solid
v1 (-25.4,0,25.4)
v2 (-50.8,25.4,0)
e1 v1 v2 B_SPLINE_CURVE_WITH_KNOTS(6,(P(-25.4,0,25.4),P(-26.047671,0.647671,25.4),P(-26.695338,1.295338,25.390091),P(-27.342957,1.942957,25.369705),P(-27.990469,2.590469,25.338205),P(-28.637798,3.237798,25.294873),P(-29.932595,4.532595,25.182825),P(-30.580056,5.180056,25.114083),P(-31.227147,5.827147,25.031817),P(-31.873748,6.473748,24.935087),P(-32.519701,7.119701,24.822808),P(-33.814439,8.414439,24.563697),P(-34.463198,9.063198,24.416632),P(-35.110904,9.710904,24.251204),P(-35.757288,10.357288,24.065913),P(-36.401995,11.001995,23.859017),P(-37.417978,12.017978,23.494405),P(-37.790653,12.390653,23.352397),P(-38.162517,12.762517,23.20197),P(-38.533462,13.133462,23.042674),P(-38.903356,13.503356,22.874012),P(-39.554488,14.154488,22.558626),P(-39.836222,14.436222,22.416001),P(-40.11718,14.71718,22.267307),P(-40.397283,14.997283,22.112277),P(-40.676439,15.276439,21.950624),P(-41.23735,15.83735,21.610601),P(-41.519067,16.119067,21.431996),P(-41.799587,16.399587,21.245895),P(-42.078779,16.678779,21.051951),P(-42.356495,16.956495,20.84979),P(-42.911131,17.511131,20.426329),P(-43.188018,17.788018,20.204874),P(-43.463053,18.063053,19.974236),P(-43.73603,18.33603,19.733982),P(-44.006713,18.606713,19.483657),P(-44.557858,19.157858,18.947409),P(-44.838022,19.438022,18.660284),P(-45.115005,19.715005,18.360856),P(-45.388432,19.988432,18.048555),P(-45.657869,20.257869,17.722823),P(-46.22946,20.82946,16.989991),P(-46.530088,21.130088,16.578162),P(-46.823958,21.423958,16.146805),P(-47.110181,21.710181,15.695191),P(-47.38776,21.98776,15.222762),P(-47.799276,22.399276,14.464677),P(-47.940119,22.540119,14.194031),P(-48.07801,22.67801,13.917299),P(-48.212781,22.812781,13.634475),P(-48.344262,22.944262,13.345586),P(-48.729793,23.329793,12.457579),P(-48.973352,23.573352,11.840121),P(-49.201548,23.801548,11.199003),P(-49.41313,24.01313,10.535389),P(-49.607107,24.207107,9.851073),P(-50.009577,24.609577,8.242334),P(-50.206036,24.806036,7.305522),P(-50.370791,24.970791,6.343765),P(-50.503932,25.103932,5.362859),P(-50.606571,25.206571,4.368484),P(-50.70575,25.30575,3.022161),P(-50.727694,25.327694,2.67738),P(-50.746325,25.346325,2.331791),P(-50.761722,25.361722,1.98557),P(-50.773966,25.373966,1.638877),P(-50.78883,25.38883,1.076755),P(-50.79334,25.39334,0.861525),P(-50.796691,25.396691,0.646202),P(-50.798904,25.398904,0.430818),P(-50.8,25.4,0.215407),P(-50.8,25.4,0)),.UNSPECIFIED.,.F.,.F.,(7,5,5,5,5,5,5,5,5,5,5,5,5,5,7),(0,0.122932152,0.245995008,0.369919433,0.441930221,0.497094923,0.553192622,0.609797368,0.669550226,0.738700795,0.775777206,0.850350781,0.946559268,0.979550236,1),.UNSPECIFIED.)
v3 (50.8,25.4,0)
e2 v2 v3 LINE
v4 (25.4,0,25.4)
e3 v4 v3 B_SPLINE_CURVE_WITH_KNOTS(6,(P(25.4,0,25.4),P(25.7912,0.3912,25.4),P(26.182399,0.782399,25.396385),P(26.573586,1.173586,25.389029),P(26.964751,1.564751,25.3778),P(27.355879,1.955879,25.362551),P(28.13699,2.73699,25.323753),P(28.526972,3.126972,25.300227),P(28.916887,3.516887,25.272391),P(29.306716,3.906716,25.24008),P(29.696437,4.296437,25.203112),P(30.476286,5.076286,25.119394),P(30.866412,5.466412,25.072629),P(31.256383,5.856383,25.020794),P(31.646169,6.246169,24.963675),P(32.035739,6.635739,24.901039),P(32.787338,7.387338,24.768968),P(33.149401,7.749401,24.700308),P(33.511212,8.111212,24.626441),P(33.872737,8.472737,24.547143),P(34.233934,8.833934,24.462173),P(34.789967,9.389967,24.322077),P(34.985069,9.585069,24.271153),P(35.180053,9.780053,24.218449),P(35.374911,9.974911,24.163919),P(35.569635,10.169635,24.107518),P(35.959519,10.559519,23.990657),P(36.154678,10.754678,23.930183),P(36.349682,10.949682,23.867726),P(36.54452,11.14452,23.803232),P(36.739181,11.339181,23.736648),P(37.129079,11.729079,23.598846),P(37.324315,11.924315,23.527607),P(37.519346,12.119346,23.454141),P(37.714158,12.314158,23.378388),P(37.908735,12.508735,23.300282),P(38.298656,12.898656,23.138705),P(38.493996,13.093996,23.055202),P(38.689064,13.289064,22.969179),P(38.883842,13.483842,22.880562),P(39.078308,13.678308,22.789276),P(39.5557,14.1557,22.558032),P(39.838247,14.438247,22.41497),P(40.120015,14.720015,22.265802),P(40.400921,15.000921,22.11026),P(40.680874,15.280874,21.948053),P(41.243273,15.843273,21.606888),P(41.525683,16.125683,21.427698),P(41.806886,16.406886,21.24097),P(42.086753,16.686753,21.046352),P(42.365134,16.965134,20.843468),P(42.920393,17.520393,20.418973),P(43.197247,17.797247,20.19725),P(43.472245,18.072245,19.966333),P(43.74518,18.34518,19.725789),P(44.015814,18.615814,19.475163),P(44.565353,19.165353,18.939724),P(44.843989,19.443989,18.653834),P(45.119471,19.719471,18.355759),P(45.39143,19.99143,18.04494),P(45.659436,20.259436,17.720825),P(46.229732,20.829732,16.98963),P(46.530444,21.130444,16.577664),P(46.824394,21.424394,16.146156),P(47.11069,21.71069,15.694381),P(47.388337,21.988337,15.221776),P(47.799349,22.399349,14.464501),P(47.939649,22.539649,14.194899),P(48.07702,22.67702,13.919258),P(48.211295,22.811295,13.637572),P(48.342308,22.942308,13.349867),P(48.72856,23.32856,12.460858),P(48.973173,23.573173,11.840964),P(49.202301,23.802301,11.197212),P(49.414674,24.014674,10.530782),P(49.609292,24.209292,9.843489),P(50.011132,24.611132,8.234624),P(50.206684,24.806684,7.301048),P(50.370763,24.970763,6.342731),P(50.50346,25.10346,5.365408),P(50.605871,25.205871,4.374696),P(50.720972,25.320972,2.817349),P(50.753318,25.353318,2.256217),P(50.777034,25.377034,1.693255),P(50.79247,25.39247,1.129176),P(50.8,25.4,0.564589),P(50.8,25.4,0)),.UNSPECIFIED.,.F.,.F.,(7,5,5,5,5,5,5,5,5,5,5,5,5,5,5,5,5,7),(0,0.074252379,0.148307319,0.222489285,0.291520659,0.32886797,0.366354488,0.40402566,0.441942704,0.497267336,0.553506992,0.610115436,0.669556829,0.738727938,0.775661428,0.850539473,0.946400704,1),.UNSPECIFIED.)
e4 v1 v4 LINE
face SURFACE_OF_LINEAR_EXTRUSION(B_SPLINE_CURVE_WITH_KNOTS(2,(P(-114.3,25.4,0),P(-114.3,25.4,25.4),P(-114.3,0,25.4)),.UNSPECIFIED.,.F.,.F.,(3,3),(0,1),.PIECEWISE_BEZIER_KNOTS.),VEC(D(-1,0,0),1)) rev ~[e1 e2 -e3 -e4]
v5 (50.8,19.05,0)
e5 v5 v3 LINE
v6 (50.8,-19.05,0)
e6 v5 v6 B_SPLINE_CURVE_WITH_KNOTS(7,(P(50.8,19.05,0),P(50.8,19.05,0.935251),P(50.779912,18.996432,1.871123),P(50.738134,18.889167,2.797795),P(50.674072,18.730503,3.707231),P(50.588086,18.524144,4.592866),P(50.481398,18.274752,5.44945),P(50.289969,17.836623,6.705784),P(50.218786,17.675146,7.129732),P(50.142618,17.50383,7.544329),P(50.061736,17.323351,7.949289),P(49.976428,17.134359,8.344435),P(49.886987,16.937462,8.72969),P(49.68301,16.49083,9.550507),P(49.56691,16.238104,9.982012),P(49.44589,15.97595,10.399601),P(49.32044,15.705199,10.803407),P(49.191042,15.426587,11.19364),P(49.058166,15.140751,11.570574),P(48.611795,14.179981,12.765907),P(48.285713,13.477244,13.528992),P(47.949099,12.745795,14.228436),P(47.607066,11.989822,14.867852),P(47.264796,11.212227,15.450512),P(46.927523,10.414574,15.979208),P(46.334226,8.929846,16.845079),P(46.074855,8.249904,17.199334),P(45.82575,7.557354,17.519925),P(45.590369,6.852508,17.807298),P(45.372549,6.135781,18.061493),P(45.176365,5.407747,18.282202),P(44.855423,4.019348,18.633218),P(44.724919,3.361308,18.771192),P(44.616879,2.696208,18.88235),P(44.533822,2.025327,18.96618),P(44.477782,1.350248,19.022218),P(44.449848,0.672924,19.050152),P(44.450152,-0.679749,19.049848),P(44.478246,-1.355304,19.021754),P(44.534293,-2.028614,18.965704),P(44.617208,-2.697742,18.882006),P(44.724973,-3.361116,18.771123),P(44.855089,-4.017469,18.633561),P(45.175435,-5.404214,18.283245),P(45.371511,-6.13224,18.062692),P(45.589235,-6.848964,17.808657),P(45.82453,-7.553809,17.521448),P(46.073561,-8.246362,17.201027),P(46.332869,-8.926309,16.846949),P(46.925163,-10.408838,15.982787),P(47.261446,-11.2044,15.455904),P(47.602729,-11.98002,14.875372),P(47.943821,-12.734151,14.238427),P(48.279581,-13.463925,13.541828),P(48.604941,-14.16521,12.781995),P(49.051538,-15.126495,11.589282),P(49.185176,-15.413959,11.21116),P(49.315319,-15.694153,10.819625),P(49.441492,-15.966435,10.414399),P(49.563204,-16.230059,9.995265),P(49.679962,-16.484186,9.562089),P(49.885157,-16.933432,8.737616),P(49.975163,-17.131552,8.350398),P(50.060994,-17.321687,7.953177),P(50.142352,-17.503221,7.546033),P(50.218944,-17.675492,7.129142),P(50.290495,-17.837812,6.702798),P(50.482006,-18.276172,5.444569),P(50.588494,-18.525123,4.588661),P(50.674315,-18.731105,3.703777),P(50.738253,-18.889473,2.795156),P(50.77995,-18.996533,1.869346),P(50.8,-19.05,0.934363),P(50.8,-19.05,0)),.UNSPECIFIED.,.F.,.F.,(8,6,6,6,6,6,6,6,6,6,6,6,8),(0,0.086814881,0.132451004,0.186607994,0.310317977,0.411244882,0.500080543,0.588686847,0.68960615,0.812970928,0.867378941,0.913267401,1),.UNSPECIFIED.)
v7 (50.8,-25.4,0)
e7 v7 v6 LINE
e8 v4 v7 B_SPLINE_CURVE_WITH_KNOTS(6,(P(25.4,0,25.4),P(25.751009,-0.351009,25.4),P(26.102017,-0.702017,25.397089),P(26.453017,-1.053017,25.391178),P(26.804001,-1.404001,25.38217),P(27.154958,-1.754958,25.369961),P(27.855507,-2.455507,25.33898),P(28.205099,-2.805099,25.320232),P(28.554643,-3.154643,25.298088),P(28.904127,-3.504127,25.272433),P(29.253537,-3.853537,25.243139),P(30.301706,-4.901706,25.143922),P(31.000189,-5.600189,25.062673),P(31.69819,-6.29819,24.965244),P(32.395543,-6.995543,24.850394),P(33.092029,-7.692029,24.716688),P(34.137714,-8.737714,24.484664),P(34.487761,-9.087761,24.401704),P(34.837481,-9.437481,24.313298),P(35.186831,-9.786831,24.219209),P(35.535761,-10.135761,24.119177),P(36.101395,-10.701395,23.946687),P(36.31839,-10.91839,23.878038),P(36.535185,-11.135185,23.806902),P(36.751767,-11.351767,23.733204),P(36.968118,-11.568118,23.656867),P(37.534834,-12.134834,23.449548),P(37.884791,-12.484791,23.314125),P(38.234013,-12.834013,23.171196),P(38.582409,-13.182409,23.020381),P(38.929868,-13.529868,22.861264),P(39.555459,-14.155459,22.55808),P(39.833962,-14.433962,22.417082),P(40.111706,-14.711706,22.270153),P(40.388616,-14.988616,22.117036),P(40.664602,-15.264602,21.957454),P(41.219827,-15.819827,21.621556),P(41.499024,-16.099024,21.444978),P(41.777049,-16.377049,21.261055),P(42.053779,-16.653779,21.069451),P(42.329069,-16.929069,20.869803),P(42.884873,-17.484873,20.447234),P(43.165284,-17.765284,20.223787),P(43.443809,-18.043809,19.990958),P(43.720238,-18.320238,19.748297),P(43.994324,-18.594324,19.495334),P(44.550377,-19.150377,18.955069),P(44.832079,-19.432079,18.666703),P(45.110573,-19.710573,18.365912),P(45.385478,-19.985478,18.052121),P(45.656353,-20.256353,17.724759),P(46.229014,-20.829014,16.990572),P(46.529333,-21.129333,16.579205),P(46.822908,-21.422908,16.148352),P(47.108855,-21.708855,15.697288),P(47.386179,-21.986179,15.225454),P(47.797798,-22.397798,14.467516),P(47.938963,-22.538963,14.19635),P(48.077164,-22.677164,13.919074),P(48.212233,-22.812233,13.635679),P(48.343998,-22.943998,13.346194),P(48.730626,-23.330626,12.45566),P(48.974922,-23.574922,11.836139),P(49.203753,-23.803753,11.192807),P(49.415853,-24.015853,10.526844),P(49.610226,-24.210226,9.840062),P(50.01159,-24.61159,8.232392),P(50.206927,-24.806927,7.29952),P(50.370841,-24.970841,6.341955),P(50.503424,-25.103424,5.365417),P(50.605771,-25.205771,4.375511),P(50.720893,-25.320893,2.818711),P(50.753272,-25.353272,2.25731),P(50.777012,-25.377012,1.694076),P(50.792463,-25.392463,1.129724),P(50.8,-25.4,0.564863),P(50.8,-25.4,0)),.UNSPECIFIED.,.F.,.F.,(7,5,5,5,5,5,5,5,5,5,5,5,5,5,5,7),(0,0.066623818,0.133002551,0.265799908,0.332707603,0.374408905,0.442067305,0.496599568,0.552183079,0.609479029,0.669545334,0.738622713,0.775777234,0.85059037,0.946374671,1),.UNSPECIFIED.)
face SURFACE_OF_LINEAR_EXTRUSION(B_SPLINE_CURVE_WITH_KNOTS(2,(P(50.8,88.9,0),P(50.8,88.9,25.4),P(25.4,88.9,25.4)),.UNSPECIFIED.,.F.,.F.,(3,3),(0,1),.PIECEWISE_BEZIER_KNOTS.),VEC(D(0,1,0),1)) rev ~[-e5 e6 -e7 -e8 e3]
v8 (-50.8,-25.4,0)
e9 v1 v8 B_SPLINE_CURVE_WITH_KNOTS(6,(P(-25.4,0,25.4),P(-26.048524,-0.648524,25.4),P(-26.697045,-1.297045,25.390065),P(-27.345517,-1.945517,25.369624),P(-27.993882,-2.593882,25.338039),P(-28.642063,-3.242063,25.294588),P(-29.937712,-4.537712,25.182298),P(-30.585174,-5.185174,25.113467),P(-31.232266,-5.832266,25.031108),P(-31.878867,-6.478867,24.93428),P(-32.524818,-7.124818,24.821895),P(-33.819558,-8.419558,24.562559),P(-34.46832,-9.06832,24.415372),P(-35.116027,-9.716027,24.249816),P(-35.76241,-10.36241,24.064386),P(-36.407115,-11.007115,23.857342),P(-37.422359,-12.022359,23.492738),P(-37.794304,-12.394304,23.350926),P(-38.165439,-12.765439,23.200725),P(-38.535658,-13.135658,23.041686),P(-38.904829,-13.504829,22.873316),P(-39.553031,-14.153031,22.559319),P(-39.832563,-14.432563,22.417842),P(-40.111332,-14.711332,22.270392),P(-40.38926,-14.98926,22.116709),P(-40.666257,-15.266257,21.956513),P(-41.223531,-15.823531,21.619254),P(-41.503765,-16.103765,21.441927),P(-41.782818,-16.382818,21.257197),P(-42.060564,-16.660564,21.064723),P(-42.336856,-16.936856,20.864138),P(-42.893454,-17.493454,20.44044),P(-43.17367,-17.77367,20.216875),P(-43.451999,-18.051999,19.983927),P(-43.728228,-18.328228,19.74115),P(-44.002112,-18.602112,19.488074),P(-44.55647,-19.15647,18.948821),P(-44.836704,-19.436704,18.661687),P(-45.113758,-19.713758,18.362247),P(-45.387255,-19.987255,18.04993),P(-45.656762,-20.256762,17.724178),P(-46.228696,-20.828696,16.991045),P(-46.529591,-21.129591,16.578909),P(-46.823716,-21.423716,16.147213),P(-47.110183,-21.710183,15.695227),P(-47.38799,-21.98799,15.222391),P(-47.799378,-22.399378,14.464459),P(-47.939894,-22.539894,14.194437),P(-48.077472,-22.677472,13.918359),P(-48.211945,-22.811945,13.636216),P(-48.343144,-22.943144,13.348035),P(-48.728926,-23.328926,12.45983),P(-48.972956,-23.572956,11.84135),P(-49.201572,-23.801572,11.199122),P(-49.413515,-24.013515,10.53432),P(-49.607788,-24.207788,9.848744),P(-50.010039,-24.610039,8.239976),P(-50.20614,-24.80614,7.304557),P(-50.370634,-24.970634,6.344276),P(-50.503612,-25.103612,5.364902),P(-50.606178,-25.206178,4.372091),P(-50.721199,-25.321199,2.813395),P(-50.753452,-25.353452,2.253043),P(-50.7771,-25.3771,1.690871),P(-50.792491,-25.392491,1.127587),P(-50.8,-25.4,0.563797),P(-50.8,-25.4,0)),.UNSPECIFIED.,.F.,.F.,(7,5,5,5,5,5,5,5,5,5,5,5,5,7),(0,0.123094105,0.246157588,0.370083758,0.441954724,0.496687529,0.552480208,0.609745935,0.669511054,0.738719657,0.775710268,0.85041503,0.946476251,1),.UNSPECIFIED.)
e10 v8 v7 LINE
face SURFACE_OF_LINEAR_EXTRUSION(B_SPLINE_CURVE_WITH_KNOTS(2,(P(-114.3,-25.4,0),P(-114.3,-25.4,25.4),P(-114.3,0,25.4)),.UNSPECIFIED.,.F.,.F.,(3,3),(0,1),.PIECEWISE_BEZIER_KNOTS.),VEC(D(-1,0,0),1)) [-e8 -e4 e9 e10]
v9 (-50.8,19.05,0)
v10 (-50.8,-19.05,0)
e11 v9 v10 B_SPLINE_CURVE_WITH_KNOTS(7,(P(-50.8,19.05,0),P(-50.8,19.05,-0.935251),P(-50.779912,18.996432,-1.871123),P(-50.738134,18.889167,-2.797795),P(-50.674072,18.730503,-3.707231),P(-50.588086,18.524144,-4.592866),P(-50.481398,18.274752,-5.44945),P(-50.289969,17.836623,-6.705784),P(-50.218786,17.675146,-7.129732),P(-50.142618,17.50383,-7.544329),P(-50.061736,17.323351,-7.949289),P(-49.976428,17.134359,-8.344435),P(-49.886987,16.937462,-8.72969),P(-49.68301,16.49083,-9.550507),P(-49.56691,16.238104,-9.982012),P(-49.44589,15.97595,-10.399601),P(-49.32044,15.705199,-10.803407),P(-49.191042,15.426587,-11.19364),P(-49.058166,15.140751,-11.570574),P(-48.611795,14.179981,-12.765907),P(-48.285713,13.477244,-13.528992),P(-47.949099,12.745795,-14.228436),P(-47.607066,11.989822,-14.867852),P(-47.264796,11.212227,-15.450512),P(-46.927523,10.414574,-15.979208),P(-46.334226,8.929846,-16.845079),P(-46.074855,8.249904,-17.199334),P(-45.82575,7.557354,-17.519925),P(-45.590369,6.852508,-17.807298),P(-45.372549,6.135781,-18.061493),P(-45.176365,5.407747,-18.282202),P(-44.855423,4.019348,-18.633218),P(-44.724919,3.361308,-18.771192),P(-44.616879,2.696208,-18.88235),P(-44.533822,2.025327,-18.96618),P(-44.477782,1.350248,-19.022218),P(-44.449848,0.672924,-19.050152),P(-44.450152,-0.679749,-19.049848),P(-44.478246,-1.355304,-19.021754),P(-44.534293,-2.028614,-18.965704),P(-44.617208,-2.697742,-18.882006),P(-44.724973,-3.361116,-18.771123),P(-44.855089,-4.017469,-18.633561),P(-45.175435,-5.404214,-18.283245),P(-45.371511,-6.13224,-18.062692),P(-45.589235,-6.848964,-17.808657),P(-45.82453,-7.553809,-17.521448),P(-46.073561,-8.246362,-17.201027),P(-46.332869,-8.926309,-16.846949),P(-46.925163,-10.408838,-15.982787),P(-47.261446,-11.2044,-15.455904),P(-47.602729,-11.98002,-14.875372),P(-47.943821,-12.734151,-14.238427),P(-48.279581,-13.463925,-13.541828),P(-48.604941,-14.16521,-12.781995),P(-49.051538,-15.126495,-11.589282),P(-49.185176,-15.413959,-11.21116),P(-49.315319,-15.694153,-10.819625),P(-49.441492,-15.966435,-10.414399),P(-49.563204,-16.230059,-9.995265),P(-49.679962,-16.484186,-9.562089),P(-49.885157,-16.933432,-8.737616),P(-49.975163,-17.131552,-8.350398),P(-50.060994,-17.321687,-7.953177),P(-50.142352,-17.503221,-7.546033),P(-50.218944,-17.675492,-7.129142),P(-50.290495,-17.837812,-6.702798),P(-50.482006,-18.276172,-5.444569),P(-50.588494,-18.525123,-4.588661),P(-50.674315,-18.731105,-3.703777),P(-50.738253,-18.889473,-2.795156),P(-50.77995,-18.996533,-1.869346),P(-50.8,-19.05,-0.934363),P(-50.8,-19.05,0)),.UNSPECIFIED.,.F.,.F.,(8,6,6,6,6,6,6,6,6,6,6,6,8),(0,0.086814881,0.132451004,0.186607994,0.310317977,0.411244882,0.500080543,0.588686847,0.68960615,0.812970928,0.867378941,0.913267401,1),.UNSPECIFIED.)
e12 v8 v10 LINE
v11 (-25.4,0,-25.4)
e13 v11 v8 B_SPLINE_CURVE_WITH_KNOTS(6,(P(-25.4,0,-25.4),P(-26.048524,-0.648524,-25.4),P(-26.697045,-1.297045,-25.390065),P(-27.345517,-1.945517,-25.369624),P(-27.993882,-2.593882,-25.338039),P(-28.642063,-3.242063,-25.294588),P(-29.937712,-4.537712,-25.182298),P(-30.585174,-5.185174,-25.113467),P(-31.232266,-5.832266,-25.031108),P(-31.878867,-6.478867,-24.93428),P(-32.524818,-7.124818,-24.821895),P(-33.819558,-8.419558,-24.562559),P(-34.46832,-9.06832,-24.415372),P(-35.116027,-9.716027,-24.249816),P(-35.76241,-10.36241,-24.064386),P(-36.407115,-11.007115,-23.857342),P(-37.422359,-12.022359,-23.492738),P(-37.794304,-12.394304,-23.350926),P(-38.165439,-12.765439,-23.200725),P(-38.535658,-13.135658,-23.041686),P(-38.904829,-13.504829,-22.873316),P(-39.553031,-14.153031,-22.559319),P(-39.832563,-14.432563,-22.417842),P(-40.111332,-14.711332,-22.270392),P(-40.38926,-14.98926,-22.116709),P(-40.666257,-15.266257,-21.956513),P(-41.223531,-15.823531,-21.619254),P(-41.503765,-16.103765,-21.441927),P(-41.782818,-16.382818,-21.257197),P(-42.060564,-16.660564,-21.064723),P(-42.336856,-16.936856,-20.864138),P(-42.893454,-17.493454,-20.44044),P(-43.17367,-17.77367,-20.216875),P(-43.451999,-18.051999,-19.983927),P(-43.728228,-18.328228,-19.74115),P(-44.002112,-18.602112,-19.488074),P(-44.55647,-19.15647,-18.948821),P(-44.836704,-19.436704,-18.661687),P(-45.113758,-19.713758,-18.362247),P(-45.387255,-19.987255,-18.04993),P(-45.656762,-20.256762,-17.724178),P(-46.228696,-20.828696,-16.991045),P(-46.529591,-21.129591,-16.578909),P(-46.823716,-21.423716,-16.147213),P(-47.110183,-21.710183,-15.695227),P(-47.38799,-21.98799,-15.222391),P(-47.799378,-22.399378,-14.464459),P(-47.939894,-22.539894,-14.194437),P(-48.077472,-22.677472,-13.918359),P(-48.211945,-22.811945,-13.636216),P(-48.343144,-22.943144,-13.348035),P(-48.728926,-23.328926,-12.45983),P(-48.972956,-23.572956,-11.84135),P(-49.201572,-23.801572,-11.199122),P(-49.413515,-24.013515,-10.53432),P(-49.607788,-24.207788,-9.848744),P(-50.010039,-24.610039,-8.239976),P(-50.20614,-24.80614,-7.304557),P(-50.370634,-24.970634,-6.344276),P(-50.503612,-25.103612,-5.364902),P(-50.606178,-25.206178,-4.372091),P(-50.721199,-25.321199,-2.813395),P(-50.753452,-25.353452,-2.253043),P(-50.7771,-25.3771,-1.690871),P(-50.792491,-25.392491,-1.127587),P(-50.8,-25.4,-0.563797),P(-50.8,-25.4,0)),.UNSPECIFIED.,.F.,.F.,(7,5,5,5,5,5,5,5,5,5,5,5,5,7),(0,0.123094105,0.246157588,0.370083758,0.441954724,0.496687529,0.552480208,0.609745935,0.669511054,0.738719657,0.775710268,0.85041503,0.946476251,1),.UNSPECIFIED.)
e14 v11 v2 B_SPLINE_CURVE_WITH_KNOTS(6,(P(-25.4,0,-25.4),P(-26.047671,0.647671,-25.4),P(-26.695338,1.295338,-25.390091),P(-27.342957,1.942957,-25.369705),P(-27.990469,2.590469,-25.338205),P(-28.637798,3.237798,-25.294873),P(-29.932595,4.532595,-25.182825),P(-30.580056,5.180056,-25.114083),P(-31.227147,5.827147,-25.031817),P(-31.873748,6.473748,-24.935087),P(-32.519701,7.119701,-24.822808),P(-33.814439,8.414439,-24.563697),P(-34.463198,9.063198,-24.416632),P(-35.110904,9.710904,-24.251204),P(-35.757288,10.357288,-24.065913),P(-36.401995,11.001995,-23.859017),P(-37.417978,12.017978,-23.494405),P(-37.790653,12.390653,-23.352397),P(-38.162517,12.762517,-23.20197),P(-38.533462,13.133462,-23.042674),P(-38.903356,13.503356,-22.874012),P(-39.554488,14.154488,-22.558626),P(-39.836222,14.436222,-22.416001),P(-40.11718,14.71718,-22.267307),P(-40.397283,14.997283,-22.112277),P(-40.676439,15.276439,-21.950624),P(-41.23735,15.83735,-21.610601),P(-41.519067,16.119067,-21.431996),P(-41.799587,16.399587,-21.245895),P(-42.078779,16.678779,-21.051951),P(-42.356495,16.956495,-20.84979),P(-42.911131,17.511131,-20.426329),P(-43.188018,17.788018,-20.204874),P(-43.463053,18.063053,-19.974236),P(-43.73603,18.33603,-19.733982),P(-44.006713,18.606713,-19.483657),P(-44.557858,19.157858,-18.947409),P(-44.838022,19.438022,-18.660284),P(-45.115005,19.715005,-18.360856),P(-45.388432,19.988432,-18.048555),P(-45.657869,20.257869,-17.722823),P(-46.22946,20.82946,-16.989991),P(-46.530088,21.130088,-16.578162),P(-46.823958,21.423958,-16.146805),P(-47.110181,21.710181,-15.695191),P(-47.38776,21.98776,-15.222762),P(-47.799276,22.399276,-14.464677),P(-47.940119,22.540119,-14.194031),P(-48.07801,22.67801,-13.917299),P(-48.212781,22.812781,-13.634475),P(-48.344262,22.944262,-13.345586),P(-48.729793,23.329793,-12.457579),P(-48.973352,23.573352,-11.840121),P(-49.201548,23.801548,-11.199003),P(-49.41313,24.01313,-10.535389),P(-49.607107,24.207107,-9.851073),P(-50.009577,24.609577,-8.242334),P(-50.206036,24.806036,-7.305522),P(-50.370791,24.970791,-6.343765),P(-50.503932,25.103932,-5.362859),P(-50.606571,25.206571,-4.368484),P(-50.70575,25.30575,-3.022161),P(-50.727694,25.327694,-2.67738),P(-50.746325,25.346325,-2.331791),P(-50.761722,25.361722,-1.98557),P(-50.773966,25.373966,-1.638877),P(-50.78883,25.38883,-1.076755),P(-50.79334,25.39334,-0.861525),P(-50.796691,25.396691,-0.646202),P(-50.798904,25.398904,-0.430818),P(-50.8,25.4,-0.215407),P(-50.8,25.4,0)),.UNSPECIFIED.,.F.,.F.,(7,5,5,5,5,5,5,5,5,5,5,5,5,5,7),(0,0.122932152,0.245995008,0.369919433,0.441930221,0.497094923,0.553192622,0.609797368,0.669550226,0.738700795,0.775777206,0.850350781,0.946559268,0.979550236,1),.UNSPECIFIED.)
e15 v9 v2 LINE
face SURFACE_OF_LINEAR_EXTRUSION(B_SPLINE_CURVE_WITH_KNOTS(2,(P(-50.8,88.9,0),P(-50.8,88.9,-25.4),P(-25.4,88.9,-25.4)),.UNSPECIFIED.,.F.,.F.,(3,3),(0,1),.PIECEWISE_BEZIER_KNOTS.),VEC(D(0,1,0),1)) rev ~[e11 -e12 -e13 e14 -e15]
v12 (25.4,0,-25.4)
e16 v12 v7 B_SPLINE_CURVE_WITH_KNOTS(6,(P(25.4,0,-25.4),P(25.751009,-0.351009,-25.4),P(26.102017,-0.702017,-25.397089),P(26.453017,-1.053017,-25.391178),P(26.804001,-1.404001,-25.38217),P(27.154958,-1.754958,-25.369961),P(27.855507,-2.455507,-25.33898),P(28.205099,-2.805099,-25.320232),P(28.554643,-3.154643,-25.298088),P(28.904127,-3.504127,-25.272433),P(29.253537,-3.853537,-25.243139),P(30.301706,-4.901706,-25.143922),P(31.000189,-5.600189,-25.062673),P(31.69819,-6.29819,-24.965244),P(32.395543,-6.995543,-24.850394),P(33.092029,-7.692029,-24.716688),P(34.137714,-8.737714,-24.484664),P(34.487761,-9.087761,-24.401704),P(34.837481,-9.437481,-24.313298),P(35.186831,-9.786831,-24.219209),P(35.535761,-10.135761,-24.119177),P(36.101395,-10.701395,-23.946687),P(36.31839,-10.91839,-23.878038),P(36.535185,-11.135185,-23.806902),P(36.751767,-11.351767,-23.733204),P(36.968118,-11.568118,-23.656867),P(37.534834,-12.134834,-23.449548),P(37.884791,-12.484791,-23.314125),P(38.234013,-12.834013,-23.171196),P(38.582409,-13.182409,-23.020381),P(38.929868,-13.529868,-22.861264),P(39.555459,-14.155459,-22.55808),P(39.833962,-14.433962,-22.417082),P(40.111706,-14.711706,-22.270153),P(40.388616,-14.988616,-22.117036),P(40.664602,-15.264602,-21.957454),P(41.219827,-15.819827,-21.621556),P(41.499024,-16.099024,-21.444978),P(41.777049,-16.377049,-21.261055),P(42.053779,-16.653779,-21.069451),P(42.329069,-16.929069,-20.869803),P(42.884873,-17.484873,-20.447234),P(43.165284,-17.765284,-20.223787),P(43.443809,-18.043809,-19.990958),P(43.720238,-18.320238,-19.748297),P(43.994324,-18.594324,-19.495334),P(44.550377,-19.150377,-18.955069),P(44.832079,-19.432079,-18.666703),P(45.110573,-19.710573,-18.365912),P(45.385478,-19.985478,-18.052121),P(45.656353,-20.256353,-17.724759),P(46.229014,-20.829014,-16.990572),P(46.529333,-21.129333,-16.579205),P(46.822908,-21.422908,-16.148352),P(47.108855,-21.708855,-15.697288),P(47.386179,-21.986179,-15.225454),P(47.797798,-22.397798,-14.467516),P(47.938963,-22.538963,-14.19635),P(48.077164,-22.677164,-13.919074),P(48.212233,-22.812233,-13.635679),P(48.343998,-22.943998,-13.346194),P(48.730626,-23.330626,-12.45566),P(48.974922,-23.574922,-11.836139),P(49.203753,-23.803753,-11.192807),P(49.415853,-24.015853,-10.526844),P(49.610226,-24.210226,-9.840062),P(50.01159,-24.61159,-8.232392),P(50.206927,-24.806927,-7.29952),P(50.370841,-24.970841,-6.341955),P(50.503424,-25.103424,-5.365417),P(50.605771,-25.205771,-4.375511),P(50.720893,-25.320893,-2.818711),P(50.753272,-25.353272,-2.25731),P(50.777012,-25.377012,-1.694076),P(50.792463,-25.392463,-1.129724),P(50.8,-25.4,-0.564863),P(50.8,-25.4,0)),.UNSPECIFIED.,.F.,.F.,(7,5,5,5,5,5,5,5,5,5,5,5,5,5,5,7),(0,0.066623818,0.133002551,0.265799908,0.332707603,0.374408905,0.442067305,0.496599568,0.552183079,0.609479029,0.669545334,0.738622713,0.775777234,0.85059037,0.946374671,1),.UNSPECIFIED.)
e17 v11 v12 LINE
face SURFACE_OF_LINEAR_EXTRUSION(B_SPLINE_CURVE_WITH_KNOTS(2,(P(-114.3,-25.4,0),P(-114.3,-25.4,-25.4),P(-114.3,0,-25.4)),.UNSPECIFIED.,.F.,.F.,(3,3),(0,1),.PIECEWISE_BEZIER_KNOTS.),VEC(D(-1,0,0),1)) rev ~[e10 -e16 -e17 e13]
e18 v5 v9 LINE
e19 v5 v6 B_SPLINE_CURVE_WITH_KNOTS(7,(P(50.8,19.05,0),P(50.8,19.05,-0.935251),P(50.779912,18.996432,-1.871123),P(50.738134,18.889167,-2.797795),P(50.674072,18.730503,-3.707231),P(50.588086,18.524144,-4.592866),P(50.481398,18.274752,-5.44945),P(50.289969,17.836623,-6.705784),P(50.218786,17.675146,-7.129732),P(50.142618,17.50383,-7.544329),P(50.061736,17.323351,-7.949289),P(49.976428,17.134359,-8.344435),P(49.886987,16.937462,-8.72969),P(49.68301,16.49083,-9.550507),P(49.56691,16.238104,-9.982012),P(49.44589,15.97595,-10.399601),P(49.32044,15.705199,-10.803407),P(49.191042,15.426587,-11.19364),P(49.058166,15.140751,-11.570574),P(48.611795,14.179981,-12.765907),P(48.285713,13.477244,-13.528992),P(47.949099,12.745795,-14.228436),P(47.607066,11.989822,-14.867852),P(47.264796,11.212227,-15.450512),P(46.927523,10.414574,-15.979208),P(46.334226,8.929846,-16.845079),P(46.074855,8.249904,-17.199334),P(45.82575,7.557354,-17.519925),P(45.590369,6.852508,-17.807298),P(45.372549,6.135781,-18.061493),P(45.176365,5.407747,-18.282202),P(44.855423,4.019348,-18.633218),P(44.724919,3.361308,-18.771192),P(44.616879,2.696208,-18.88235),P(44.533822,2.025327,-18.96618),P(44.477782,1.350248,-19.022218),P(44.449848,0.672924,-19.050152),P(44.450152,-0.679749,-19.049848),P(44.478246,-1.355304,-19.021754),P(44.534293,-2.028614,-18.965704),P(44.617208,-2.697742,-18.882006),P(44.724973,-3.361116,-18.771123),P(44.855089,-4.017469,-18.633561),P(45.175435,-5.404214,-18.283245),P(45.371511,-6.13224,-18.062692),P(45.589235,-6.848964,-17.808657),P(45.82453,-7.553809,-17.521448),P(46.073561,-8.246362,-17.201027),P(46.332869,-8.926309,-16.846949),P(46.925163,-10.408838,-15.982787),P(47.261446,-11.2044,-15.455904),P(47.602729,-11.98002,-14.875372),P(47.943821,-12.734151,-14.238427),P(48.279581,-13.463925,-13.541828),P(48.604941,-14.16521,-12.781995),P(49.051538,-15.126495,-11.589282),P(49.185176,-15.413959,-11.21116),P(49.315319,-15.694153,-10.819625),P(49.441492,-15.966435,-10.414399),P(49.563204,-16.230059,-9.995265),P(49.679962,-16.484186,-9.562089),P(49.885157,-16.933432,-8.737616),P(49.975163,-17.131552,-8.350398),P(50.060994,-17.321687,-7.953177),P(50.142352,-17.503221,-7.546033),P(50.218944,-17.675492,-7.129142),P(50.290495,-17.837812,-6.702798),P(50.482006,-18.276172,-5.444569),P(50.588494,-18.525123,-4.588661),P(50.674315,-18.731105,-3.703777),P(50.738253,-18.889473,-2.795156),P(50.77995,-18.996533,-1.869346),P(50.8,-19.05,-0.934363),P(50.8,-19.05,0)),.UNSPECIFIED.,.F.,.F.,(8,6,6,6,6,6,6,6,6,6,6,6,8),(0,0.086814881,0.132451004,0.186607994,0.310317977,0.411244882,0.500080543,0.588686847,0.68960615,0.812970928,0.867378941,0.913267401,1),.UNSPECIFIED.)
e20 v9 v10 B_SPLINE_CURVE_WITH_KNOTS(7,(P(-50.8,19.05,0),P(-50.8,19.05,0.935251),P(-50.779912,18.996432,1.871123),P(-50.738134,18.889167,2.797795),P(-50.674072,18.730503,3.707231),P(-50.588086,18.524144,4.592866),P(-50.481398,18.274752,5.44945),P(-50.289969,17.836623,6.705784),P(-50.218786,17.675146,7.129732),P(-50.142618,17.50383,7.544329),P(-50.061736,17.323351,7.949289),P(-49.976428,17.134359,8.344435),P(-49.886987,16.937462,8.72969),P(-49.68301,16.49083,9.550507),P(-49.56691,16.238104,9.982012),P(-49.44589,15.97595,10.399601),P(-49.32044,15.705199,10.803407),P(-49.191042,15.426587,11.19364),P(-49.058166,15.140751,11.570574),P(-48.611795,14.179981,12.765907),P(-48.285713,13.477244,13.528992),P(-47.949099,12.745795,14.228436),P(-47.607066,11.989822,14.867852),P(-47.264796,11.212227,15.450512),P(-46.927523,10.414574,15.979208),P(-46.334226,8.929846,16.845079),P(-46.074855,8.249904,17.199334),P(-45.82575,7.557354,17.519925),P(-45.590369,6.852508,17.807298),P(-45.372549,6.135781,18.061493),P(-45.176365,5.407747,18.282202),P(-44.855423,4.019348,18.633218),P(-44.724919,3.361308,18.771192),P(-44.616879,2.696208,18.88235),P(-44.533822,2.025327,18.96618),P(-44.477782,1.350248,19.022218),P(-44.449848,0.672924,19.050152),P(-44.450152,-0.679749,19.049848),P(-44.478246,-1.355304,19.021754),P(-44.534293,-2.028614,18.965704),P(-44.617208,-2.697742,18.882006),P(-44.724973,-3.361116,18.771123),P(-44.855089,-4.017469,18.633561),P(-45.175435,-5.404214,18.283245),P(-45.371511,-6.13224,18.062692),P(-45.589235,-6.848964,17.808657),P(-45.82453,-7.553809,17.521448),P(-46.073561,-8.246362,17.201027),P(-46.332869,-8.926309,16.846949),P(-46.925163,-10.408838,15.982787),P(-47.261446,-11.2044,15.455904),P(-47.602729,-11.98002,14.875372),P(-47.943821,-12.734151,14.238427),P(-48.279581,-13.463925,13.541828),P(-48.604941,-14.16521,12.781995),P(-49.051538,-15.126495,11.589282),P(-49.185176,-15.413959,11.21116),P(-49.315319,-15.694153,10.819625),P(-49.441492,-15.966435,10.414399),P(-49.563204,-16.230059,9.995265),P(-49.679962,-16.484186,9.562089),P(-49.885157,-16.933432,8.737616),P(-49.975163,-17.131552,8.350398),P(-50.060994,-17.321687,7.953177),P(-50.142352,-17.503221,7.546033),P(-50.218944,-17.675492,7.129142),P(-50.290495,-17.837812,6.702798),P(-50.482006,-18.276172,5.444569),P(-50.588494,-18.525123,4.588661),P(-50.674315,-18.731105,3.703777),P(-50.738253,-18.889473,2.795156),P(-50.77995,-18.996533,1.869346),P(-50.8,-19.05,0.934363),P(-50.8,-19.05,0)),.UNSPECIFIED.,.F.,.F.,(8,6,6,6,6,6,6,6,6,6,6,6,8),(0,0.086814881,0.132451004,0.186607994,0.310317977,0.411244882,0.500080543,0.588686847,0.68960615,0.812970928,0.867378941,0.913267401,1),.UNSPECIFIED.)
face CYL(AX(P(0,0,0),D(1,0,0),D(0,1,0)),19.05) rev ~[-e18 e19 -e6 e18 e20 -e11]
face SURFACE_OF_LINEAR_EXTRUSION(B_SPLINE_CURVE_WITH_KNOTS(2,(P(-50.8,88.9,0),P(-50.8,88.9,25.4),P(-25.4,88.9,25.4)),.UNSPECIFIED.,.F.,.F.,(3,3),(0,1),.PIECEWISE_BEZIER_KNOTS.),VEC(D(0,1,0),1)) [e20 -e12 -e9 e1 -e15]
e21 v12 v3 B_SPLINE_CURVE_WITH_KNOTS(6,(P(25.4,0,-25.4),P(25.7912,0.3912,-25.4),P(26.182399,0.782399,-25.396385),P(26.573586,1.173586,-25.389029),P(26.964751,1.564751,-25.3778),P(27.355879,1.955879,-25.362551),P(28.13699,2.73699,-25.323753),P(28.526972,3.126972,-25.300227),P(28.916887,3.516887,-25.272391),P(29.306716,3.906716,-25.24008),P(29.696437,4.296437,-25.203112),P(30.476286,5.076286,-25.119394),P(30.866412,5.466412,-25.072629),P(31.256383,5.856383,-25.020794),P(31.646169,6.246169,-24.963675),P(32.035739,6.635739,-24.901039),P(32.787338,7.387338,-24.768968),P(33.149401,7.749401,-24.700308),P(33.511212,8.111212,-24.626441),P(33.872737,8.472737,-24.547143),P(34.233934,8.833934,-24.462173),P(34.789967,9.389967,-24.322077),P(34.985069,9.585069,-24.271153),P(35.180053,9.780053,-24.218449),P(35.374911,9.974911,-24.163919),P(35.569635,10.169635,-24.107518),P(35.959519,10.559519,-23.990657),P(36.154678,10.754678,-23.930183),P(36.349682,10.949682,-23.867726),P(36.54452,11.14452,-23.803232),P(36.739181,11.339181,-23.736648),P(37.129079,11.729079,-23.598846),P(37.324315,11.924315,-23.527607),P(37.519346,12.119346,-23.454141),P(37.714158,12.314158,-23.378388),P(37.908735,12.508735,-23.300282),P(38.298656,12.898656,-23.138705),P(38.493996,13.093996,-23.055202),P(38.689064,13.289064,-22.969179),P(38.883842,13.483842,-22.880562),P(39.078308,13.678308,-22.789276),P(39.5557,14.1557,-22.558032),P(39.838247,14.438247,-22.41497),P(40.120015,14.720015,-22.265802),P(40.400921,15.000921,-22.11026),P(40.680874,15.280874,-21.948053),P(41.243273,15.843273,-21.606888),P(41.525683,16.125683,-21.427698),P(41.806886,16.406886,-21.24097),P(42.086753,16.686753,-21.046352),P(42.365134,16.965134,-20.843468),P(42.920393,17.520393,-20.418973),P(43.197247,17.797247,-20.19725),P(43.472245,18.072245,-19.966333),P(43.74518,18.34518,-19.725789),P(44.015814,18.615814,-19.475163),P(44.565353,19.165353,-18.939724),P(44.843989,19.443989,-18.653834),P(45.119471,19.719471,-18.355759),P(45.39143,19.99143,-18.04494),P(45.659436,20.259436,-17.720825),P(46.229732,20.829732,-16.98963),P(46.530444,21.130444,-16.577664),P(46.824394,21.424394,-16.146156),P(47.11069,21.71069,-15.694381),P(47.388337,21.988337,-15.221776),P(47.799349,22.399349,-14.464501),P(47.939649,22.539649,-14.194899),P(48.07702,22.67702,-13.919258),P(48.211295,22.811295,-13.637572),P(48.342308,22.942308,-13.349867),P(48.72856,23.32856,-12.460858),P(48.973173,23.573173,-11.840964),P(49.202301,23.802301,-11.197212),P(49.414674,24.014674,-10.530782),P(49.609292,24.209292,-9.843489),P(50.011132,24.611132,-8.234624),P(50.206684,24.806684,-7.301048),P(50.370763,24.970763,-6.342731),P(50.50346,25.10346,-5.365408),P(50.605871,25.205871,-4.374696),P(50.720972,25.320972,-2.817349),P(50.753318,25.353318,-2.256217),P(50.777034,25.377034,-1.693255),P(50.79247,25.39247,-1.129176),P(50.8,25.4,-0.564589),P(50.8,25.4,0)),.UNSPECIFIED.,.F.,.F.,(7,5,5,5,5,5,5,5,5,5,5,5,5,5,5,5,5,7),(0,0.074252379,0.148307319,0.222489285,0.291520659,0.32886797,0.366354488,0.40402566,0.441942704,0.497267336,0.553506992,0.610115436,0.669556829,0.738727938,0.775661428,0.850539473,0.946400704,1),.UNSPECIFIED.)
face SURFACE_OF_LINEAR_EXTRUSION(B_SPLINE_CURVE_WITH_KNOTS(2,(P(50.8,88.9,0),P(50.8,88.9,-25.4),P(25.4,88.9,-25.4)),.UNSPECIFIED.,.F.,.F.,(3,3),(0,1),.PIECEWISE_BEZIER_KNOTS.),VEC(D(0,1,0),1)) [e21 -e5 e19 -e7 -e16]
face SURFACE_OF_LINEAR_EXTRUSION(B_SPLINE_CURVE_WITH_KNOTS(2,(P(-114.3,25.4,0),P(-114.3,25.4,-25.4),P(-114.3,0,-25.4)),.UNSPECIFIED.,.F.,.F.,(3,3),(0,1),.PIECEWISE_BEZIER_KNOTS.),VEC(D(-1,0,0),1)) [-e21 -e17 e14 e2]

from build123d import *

# Parameters (mm, degrees)
F0_W          = 101.6
F0_H          = 50.8
F1_DEPTH      = 25.4
F2_T1_DEPTH   = 177.8
F2_T3_DEPTH   = 228.6
F4_R          = 19.05
F5_DEPTH      = 50.8
F5_DEPTH_BACK = 50.8


# Not quite as in the source:
# - a fillet or chamfer that OpenCascade refuses, or shapes differently, is made with other operations: its cross-section is extruded or revolved along the edge and cut away or added
# - the program builds the solid bodies; features that only make, move or delete a surface that nothing else refers to are left out


with BuildPart() as f1:
    # F0 (on Top) → F1 (new body)
    with BuildSketch(Plane.XY):
        Rectangle(F0_W, F0_H)
    extrude(amount=F1_DEPTH)

    # F2: fillet of radius 25.4 on 4 edges, made by hand

    # F2_s2 → F2_t1 (cut)
    with BuildSketch(Plane.XZ.offset(-88.9)):
        with BuildLine():
            add(Edge.make_bspline(
                [(50.8, 0), (50.8, 25.4), (25.4, 25.4)],
                knots=[0, 0, 0, 1, 1, 1], degree=2, weights=[1, 1, 1]))
            Line((25.4, 25.4), (50.8, 25.4))
            Line((50.8, 25.4), (50.8, 0))
        make_face()
        with BuildLine():
            add(Edge.make_bspline(
                [(-50.8, 0), (-50.8, 25.4), (-25.4, 25.4)],
                knots=[0, 0, 0, 1, 1, 1], degree=2, weights=[1, 1, 1]))
            Line((-25.4, 25.4), (-50.8, 25.4))
            Line((-50.8, 25.4), (-50.8, 0))
        make_face()
    extrude(amount=F2_T1_DEPTH, mode=Mode.SUBTRACT)

    # F2_s4 → F2_t3 (cut)
    with BuildSketch(Plane.YZ.offset(-114.3)):
        with BuildLine():
            add(Edge.make_bspline(
                [(25.4, 0), (25.4, 25.4), (0, 25.4)],
                knots=[0, 0, 0, 1, 1, 1], degree=2, weights=[1, 1, 1]))
            Line((0, 25.4), (25.4, 25.4))
            Line((25.4, 25.4), (25.4, 0))
        make_face()
        with BuildLine():
            add(Edge.make_bspline(
                [(-25.4, 0), (-25.4, 25.4), (0, 25.4)],
                knots=[0, 0, 0, 1, 1, 1], degree=2, weights=[1, 1, 1]))
            Line((0, 25.4), (-25.4, 25.4))
            Line((-25.4, 25.4), (-25.4, 0))
        make_face()
    extrude(amount=F2_T3_DEPTH, mode=Mode.SUBTRACT)

    # F3: F1 across plane


with BuildPart() as f1_1:
    add(f1.part)
    add(f1.part.mirror(Plane.XY))

    # F4 (on Right) → F5 (cut, two sides)
    with BuildSketch(Plane.YZ) as f5_sk:
        Circle(F4_R)
    extrude(amount=-F5_DEPTH, mode=Mode.SUBTRACT)
    extrude(f5_sk.sketch, amount=F5_DEPTH_BACK, mode=Mode.SUBTRACT)


solid = f1_1.part
